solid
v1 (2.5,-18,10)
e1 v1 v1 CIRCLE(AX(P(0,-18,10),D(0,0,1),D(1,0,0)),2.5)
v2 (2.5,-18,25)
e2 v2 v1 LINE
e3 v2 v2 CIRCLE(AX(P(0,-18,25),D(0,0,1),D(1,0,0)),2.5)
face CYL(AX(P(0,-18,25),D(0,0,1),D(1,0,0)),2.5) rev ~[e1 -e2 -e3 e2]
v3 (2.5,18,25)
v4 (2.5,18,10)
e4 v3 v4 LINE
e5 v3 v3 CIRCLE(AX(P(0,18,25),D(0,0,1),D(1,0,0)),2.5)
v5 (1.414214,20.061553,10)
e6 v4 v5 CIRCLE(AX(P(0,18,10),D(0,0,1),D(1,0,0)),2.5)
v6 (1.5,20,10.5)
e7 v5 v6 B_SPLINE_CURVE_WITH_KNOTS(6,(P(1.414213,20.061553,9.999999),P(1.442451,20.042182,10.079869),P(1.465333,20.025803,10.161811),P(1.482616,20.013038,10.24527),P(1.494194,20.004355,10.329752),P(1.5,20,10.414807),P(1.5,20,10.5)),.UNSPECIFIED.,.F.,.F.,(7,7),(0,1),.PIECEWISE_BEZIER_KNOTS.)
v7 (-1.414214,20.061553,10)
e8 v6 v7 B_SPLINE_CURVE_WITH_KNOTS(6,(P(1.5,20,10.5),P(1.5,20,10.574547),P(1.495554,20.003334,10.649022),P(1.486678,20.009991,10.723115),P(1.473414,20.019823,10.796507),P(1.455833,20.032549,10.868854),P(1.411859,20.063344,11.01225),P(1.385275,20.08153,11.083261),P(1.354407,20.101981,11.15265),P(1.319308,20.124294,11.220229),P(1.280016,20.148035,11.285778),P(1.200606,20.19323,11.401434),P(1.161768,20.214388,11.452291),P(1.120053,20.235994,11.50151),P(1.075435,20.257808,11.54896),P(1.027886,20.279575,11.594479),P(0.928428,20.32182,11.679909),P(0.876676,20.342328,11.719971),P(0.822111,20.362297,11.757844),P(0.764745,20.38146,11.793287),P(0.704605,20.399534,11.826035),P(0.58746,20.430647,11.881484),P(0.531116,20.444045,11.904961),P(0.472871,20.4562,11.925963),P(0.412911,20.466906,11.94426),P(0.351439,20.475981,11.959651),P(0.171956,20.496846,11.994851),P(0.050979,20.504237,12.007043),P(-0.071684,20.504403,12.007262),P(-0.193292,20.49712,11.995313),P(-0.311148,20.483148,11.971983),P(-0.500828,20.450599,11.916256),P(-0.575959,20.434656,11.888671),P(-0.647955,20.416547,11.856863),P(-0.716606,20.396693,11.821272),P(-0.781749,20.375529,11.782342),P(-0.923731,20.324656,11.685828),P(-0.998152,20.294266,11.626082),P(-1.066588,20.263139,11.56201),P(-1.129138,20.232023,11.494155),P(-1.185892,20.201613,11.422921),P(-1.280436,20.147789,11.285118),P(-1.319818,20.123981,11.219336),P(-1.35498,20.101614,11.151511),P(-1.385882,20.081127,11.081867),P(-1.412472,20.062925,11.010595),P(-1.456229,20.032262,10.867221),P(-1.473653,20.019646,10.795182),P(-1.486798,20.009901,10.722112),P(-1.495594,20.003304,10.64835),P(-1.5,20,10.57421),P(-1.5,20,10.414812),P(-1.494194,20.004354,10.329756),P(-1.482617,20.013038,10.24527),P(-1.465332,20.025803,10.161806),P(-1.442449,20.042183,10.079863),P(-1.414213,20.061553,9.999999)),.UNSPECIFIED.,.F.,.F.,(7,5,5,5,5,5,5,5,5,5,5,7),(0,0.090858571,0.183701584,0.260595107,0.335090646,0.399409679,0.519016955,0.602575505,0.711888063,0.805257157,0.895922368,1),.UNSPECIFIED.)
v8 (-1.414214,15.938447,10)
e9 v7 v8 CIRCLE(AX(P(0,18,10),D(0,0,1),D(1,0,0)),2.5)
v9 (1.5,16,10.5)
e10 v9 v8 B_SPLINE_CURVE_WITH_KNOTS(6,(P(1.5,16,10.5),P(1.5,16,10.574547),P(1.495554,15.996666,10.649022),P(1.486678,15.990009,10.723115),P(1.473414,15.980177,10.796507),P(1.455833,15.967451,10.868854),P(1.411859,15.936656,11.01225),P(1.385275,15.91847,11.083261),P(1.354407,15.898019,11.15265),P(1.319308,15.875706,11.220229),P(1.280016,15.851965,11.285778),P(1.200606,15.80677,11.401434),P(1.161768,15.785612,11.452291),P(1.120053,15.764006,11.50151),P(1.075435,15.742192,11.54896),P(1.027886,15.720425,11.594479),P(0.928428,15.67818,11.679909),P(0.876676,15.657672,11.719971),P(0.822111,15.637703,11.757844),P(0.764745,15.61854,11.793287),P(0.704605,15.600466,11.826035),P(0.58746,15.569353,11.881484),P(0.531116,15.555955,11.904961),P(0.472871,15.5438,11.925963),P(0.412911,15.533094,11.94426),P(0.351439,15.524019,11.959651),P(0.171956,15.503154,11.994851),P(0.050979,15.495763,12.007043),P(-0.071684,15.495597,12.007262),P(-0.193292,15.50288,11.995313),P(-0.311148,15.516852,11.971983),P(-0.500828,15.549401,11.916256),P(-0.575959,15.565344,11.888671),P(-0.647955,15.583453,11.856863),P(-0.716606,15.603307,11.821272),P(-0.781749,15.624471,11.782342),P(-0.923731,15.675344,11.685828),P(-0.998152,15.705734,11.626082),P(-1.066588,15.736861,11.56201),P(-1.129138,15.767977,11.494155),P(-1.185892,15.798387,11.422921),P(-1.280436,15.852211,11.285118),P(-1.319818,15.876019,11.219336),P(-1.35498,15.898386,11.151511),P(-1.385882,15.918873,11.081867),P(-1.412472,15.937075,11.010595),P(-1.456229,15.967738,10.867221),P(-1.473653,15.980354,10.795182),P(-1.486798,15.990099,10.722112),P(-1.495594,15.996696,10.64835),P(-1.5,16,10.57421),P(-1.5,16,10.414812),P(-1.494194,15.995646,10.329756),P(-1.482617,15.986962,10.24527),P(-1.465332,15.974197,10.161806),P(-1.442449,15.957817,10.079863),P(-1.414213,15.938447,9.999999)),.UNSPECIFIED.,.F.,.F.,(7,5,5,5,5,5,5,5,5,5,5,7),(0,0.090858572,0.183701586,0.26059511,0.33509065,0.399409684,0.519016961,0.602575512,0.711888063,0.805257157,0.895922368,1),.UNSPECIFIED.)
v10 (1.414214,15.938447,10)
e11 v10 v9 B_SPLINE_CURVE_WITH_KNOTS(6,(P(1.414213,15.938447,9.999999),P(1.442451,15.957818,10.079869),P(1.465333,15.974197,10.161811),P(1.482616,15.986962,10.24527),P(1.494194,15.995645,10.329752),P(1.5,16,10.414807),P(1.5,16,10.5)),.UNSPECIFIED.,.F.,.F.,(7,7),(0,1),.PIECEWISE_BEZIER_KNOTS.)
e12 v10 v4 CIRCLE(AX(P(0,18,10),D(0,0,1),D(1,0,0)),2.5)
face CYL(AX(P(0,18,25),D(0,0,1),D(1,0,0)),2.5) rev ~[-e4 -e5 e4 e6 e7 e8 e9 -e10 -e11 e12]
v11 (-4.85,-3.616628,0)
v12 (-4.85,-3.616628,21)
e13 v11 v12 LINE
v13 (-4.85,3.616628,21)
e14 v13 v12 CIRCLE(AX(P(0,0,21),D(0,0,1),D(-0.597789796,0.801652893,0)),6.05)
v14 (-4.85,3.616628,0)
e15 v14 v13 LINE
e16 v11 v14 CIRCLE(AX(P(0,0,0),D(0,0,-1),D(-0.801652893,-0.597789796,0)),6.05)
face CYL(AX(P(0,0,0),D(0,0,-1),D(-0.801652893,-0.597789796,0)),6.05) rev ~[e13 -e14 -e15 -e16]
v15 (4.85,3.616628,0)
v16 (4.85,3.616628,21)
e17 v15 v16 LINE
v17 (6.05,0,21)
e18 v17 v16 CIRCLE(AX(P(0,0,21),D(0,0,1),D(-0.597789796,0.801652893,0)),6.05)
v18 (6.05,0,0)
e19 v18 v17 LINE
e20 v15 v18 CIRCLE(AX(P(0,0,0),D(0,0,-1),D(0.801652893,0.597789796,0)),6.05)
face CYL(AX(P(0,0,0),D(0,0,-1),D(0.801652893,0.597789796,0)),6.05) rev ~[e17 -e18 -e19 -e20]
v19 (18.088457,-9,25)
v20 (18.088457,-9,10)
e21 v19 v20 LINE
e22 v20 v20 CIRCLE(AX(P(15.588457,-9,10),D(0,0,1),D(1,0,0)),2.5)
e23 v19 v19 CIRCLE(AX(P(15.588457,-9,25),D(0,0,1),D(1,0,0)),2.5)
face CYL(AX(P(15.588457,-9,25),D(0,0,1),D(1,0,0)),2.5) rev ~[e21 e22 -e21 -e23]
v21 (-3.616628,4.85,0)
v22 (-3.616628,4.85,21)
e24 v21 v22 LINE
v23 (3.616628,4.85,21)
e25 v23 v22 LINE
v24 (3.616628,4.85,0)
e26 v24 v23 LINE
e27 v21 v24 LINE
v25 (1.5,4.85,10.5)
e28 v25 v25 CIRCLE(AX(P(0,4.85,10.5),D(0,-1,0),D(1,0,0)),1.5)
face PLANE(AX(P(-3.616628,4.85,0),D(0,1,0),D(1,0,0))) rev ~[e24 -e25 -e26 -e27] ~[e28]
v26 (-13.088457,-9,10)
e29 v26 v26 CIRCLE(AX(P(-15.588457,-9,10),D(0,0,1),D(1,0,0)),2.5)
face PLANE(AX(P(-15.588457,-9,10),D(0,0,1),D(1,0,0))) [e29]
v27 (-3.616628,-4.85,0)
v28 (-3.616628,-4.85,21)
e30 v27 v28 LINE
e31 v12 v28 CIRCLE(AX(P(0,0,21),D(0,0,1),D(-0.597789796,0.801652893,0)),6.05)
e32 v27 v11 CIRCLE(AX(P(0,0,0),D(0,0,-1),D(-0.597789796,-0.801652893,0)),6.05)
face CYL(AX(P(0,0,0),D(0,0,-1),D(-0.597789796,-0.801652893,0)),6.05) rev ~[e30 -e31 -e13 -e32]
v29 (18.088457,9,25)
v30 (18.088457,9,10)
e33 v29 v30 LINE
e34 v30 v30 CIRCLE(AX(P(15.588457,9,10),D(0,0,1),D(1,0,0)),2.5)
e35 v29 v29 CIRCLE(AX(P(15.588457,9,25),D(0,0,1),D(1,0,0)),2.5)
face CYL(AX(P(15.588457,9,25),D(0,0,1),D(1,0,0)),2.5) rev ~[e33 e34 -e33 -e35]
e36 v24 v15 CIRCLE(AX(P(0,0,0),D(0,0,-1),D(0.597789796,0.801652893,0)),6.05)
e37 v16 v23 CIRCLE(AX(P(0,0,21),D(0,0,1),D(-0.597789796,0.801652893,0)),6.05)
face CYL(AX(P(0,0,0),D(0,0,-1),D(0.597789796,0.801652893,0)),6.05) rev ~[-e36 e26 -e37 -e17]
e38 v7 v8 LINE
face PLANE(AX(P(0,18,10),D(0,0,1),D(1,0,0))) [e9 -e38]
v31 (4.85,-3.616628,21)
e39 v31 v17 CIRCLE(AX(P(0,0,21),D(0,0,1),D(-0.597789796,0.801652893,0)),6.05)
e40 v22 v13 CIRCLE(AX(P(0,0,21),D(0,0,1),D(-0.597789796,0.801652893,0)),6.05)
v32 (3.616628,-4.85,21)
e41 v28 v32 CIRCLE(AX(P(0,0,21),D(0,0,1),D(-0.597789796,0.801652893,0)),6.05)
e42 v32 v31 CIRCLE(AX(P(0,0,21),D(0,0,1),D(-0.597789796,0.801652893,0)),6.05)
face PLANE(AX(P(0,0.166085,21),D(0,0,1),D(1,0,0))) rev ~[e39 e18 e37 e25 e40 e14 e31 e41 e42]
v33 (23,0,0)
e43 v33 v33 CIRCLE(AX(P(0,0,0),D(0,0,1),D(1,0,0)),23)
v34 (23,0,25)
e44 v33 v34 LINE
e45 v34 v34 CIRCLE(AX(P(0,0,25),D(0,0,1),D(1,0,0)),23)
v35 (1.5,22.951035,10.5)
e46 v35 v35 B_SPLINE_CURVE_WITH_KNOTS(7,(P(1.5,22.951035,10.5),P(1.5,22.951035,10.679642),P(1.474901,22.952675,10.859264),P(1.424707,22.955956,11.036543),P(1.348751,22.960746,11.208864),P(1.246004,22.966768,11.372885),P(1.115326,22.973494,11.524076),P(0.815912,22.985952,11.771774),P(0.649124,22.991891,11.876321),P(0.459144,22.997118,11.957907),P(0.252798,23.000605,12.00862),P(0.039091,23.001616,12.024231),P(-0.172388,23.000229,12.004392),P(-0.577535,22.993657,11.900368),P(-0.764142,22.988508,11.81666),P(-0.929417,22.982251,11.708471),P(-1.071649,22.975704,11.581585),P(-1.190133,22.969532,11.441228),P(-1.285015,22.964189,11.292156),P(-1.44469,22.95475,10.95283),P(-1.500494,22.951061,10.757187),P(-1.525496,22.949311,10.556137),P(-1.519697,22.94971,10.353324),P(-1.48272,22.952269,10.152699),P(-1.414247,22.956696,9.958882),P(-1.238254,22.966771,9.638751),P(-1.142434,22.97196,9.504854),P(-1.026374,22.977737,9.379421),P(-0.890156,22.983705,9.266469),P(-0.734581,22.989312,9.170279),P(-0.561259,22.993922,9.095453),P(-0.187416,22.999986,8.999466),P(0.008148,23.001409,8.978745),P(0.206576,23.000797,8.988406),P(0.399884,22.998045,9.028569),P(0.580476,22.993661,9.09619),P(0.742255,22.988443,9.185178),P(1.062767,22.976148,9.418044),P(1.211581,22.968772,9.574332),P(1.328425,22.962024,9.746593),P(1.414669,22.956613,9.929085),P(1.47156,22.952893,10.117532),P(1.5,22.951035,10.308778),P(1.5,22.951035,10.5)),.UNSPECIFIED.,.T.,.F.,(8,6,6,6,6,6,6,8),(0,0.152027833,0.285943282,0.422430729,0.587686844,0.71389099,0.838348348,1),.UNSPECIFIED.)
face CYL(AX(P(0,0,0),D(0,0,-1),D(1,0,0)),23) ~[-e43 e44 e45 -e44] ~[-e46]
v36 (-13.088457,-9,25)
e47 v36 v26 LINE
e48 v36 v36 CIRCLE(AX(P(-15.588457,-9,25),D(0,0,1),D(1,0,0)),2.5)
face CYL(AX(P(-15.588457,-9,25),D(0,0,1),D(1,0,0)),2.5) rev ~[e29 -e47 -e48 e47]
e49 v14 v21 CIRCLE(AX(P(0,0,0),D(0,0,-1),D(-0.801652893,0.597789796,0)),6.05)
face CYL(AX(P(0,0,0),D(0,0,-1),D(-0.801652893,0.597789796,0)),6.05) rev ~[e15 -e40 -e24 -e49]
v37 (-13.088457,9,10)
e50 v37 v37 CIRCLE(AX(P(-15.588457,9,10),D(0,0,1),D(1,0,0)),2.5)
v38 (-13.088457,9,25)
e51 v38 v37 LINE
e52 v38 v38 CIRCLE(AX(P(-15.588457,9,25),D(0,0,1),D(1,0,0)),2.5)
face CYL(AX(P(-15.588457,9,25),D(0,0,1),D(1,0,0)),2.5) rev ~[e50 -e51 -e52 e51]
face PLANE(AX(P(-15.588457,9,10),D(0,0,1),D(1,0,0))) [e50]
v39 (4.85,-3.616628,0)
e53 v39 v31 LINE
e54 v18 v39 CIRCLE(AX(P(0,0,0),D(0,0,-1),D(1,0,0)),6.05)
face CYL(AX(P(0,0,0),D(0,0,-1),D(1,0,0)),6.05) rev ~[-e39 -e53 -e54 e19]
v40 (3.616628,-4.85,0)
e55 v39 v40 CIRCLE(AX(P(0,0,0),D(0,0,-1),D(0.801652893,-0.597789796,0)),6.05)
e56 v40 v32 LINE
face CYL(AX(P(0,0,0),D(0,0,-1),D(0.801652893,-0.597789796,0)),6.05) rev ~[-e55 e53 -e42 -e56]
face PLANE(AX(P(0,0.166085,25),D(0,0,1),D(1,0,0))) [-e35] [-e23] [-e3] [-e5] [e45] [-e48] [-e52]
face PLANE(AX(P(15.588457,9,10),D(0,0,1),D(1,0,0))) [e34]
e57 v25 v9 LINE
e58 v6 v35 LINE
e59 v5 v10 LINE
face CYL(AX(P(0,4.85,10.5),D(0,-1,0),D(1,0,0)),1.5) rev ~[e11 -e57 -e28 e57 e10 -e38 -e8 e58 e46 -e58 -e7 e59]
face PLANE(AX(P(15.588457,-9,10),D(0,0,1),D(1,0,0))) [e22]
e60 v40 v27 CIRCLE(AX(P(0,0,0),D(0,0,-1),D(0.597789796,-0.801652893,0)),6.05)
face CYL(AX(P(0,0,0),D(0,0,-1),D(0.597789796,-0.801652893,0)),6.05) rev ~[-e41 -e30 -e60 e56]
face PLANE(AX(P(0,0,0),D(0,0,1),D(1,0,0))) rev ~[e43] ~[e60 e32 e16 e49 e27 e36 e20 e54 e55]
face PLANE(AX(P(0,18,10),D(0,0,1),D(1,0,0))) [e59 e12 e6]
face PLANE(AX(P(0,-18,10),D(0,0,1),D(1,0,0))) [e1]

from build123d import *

# Parameters (mm, degrees)
F0_R     = 23
F4_DEPTH = 25
F6_R     = 2.5
F1_DEPTH = 15
F2_DEPTH = 4
F8_R     = 1.5
F3_DEPTH = 35


# Not quite as in the source:
# - a feature names something its author has since deleted; it is built from what else it names


with BuildPart() as f4:
    # F0 (on Top) → F4 (new body)
    with BuildSketch(Plane.XY):
        Circle(F0_R)
        with BuildLine():
            ThreePointArc((4.85, 3.616628264), (5.7421685799, 1.9052558883), (6.05, 0))
            ThreePointArc((6.05, 0), (5.7421685799, -1.9052558883), (4.85, -3.616628264))
            Line((4.85, -3.616628264), (4.85, -4.85))
            Line((4.85, -4.85), (3.616628264, -4.85))
            ThreePointArc((3.616628264, -4.85), (0, -6.05), (-3.616628264, -4.85))
            Line((-3.616628264, -4.85), (-4.85, -4.85))
            Line((-4.85, -4.85), (-4.85, -3.616628264))
            ThreePointArc((-4.85, -3.616628264), (-6.05, 0), (-4.85, 3.616628264))
            Line((-4.85, 3.616628264), (-4.85, 4.85))
            Line((-4.85, 4.85), (-3.616628264, 4.85))
            ThreePointArc((-3.616628264, 4.85), (0, 6.05), (3.616628264, 4.85))
            Line((3.616628264, 4.85), (4.85, 4.85))
            Line((4.85, 4.85), (4.85, 3.616628264))
        make_face(mode=Mode.SUBTRACT)
        with BuildLine():
            ThreePointArc((3.616628264, 4.85), (4.2779960262, 4.2779960262), (4.85, 3.616628264))
            Line((4.85, 3.616628264), (4.85, 4.85))
            Line((4.85, 4.85), (3.616628264, 4.85))
        make_face()
        with BuildLine():
            Line((-3.616628264, 4.85), (3.616628264, 4.85))
            ThreePointArc((3.616628264, 4.85), (0, 6.05), (-3.616628264, 4.85))
        make_face()
        with BuildLine():
            ThreePointArc((-4.85, 3.616628264), (-4.2779960262, 4.2779960262), (-3.616628264, 4.85))
            Line((-3.616628264, 4.85), (-4.85, 4.85))
            Line((-4.85, 4.85), (-4.85, 3.616628264))
        make_face()
        with BuildLine():
            Line((-4.85, -4.85), (-3.616628264, -4.85))
            ThreePointArc((-3.616628264, -4.85), (-4.2779960262, -4.2779960262), (-4.85, -3.616628264))
            Line((-4.85, -3.616628264), (-4.85, -4.85))
        make_face()
        with BuildLine():
            Line((4.85, -4.85), (4.85, -3.616628264))
            ThreePointArc((4.85, -3.616628264), (4.2779960262, -4.2779960262), (3.616628264, -4.85))
            Line((3.616628264, -4.85), (4.85, -4.85))
        make_face()
    extrude(amount=F4_DEPTH)

    # F6 (on face) → F1 (cut)
    with BuildSketch(Plane.XY.offset(25)):
        with Locations((15.5884572681, 9)):
            Circle(F6_R)
        with Locations((0, 18)):
            Circle(F6_R)
        with Locations((-15.5884572681, 9)):
            Circle(F6_R)
        with Locations((15.5884572681, -9)):
            Circle(F6_R)
        with Locations((0, -18)):
            Circle(F6_R)
        with Locations((-15.5884572681, -9)):
            Circle(F6_R)
    extrude(amount=-F1_DEPTH, mode=Mode.SUBTRACT)

    # F7 (on face) → F2 (join)
    with BuildSketch(Plane.XY.offset(25)):
        with BuildLine():
            Line((3.616628264, 4.85), (-3.616628264, 4.85))
            ThreePointArc((-3.616628264, 4.85), (0, -6.05), (3.616628264, 4.85))
        make_face()
    extrude(amount=-F2_DEPTH)

    # F8 (on face) → F3 (cut)
    with BuildSketch(Plane.XZ.offset(-4.85)):
        with Locations((0, 10.5)):
            Circle(F8_R)
    extrude(amount=-F3_DEPTH, mode=Mode.SUBTRACT)


solid = f4.part
